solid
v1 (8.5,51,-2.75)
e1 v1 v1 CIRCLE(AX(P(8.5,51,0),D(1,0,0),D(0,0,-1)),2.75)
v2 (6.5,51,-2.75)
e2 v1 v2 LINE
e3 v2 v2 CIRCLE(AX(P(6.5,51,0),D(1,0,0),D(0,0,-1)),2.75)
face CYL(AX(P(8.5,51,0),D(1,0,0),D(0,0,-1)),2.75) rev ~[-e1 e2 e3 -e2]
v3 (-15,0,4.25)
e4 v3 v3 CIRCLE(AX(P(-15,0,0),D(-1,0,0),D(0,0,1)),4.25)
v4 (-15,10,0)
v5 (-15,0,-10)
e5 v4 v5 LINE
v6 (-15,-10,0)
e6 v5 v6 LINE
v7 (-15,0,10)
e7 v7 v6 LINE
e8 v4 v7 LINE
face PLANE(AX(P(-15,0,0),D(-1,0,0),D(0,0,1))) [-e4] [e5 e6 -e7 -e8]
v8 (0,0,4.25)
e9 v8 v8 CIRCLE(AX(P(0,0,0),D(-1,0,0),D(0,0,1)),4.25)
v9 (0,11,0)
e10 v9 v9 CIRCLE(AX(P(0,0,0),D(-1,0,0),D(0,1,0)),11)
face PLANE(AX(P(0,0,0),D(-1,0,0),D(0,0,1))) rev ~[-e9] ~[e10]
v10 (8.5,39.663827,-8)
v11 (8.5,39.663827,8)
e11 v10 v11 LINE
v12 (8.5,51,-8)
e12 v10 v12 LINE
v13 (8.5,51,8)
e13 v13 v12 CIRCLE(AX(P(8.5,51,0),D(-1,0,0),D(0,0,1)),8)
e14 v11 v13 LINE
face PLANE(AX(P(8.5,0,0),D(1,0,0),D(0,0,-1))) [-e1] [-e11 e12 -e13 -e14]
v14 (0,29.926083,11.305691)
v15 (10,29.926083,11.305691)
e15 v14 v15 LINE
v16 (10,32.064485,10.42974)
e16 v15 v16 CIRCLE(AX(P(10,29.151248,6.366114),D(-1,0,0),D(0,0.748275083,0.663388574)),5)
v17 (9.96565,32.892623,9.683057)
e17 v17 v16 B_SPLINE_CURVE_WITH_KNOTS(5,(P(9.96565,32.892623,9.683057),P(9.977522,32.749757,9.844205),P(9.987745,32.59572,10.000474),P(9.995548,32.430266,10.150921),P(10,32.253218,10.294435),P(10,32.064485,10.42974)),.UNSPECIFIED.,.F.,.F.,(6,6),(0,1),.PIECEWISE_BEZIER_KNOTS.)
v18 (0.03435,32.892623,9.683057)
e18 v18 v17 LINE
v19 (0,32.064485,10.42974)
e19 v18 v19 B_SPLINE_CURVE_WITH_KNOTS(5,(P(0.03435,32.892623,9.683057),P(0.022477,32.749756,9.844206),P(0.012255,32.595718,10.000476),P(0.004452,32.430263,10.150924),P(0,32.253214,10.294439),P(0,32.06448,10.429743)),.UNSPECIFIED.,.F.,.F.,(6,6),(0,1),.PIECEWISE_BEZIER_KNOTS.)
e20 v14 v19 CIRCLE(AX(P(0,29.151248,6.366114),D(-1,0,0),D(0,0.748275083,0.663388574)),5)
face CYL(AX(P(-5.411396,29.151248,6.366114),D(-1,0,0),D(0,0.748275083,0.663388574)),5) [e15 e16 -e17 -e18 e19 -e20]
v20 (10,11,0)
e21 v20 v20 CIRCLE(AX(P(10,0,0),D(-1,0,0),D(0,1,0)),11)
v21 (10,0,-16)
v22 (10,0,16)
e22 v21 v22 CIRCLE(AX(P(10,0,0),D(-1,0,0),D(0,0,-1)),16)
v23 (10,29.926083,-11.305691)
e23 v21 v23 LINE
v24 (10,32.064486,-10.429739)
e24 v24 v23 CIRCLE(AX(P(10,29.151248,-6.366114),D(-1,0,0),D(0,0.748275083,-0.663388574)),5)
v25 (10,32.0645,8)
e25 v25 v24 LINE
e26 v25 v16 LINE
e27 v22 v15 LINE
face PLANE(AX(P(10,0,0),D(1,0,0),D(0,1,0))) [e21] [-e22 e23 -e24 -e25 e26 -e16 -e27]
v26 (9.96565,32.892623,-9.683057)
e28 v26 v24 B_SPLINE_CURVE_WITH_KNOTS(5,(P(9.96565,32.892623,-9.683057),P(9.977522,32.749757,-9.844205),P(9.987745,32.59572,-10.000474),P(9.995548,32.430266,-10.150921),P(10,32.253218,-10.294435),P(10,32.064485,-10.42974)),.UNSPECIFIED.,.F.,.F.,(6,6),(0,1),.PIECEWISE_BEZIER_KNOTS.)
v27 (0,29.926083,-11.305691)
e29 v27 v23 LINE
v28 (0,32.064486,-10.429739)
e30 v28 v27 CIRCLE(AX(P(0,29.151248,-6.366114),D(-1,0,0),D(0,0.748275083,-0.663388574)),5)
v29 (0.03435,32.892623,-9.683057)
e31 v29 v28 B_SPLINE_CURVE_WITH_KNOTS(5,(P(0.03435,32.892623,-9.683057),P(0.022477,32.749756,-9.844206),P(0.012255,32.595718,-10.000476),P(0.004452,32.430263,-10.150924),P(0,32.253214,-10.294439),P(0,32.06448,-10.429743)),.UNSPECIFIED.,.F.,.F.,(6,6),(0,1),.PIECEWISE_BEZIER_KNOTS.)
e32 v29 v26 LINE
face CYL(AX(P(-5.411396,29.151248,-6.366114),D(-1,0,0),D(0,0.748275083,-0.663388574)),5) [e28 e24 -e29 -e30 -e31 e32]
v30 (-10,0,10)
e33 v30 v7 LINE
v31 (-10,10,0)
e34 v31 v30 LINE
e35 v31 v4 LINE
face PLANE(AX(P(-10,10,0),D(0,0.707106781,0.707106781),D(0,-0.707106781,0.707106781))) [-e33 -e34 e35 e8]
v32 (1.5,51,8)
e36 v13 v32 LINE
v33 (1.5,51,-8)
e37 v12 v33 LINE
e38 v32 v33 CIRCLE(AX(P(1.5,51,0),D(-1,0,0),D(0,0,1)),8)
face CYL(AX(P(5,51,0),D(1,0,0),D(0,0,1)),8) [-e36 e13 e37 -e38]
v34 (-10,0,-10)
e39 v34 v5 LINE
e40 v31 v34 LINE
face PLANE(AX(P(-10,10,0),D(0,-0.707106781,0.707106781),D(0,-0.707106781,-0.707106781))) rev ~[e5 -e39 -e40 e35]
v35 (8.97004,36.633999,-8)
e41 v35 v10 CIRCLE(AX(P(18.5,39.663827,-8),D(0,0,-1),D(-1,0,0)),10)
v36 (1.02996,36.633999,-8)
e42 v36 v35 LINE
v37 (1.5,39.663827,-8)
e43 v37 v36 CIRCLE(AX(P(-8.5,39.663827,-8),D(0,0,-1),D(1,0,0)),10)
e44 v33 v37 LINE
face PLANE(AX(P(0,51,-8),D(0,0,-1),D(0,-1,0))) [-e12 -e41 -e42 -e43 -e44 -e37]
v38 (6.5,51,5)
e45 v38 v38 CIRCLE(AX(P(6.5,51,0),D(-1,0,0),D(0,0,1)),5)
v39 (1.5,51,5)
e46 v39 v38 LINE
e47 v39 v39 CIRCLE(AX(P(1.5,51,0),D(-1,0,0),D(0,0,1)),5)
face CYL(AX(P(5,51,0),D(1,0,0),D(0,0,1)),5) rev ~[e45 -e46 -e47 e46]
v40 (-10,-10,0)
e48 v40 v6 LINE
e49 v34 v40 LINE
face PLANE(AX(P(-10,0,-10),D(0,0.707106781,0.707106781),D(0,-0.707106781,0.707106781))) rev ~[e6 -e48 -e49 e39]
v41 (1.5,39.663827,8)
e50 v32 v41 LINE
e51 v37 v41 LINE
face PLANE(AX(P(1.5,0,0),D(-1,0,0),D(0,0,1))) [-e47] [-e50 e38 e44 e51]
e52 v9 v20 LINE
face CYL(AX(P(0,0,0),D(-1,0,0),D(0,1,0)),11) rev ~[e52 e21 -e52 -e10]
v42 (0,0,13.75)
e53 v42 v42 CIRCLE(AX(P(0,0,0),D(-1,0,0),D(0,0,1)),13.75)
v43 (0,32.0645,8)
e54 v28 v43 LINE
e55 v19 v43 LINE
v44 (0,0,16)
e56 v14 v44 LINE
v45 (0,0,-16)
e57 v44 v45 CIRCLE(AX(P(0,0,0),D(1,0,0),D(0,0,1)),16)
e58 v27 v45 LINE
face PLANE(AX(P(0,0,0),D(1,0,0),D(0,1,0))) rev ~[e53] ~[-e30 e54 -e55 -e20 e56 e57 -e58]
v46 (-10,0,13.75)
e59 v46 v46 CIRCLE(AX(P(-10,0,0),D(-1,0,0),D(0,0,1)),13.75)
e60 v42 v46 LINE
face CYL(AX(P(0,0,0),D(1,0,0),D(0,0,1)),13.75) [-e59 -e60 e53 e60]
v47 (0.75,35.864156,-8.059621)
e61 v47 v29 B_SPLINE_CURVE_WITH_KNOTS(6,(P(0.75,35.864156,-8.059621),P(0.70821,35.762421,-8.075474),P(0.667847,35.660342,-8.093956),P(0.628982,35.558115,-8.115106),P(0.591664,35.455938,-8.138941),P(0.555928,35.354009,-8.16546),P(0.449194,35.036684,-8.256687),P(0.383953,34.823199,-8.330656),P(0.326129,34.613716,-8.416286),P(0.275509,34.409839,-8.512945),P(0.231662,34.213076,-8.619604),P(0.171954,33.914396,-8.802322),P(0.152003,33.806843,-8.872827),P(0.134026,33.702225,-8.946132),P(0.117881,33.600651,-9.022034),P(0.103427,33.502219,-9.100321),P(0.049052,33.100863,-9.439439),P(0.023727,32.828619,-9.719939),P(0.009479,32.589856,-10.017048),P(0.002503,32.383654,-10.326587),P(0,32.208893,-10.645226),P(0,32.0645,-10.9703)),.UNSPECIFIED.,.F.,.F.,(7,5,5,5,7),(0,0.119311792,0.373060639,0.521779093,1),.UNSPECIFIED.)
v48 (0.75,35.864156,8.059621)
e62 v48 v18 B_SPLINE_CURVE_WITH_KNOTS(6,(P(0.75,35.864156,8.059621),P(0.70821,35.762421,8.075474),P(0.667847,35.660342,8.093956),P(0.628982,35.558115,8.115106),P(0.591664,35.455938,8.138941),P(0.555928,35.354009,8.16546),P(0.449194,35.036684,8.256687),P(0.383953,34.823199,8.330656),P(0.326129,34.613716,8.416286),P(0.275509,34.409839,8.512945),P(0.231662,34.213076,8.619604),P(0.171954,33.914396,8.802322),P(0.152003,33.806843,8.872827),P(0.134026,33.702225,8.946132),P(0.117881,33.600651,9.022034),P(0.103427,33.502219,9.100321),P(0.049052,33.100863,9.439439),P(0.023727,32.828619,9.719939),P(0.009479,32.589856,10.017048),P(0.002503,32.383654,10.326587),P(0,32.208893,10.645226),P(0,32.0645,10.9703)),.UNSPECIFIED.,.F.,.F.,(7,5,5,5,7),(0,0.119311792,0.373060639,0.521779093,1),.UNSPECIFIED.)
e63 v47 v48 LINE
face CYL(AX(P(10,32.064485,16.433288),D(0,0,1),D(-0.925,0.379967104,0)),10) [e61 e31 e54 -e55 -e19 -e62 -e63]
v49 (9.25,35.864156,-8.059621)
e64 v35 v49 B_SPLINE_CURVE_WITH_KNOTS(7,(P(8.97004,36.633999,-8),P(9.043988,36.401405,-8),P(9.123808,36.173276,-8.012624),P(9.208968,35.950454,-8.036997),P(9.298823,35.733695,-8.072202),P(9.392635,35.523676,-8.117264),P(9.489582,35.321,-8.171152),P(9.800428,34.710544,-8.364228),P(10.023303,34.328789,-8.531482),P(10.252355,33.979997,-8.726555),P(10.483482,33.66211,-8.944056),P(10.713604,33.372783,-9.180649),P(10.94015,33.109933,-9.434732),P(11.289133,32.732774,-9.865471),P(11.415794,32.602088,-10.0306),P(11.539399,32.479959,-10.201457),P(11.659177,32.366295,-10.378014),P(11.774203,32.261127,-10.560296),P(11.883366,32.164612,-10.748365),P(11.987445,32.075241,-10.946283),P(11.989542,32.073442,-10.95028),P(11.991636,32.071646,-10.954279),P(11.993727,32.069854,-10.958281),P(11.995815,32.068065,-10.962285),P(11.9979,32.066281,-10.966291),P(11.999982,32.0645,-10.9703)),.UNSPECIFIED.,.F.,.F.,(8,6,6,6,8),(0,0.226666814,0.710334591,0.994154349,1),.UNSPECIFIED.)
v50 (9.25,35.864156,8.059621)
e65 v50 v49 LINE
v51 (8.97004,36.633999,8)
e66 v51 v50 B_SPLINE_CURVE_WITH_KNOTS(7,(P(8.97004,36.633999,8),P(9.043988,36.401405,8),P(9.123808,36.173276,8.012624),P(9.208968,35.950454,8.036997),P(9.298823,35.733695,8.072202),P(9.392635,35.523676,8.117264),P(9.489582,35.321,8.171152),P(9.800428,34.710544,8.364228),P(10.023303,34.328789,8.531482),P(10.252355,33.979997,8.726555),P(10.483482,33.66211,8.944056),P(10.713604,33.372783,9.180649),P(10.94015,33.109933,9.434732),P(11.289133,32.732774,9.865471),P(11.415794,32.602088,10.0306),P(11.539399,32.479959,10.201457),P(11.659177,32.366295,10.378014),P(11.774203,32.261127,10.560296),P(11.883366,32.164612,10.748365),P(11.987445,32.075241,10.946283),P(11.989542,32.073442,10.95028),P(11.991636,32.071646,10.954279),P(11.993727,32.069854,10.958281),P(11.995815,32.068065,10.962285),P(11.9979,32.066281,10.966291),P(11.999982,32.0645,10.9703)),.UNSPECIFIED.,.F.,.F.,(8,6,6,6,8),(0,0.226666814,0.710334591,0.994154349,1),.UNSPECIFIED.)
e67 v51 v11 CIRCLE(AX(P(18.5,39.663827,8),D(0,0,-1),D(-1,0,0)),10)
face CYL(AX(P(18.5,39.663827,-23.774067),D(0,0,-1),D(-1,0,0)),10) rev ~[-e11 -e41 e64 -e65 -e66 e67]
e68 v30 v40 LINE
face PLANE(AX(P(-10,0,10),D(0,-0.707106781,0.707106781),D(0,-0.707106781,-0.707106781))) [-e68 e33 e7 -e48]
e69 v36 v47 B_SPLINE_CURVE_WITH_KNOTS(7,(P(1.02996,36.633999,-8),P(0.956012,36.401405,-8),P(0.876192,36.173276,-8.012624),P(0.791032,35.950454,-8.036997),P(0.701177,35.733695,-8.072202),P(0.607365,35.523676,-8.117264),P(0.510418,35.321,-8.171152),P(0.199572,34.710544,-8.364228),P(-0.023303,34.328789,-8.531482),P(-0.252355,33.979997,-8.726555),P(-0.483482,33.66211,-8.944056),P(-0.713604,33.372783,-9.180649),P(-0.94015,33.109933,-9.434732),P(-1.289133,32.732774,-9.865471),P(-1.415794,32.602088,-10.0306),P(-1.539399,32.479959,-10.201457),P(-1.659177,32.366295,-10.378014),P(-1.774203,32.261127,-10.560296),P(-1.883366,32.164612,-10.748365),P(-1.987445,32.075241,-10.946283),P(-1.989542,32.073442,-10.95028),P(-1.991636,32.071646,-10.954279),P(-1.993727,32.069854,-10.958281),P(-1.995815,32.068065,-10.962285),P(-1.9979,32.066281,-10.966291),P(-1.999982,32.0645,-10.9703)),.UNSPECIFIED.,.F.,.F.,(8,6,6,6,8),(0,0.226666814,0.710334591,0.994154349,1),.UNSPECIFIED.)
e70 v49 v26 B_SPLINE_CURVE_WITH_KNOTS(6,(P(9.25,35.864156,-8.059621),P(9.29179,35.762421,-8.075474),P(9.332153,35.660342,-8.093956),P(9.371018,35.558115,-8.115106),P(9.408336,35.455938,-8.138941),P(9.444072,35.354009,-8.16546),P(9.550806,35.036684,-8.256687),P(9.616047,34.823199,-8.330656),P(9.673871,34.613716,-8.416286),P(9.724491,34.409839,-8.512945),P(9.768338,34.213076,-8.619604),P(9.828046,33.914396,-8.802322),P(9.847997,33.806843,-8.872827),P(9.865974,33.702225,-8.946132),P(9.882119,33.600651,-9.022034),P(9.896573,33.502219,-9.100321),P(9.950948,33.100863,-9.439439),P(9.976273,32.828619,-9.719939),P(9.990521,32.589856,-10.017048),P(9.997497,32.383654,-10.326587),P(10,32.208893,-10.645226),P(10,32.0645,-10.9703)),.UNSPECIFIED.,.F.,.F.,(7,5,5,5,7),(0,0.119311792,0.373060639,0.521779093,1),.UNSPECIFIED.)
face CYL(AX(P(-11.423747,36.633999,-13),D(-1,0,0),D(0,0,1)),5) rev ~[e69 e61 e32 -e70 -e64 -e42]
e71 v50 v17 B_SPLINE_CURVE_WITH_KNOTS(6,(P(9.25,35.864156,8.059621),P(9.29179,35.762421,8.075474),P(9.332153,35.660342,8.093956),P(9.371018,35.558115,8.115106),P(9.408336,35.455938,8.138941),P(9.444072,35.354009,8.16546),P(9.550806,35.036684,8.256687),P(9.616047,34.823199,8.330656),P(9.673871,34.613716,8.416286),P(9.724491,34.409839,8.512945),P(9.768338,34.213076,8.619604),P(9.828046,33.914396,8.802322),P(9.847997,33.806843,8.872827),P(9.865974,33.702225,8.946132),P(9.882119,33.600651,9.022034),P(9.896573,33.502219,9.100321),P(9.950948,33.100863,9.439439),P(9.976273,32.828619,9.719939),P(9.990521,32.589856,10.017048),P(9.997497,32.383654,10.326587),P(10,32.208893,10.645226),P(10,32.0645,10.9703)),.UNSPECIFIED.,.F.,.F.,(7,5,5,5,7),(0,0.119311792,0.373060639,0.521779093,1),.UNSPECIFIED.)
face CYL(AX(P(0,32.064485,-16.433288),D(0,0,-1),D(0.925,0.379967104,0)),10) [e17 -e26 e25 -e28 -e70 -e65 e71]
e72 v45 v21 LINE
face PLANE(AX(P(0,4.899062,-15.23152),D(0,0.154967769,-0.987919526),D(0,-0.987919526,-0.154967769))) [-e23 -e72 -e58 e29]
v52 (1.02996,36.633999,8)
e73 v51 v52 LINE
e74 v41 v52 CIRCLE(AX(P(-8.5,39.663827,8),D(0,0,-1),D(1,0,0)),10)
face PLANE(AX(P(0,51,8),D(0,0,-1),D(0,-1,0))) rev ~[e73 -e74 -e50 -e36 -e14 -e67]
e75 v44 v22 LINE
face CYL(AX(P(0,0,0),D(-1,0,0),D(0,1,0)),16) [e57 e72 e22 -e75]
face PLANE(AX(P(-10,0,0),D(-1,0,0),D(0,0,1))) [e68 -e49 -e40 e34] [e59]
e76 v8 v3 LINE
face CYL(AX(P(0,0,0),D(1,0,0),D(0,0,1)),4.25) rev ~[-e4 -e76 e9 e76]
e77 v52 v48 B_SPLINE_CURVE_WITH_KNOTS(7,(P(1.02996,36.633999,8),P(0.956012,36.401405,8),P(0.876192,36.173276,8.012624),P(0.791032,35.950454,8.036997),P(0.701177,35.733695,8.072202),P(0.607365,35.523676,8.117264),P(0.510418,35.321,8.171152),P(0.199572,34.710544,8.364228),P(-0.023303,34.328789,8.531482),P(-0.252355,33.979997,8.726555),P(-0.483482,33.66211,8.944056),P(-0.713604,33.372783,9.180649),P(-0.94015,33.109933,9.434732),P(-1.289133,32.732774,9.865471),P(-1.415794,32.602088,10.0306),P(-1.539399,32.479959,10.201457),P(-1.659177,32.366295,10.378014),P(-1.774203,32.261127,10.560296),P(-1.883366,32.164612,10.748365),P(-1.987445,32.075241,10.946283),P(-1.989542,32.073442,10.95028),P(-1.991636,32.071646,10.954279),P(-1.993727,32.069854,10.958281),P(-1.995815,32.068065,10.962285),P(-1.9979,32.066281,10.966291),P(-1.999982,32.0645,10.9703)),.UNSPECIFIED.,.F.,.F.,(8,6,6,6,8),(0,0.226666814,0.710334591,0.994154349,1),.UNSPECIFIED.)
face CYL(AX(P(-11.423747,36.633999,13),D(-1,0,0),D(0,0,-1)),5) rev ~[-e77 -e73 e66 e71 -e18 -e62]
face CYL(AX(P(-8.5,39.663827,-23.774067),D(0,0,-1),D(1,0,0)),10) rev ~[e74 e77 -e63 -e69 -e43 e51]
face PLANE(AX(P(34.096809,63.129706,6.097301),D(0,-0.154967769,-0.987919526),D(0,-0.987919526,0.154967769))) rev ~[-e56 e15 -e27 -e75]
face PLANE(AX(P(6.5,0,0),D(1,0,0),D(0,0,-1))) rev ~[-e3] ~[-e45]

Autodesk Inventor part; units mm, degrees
ref_plane "YZ Plane" through (0, 0, 0) normal (1, 0, 0) x (0, 1, 0)
ref_plane "XZ Plane" through (0, 0, 0) normal (0, 1, 0) x (-1, 0, 0)
sketch "Esquisse1" plane through (0, 0, 0) normal (1, 0, 0) x (0, 1, 0)
  circle A0 centre (0, 0) radius 16
  line L0 (-16, 0) -> (59, 0)
  line L1 (59, 0) -> (51, 0)
  circle A1 centre (51, 0) radius 5
  circle A2 centre (51, 0) radius 8
  line L2 (0, 16) -> (51, 8)
  line L3 (51, -8) -> (0, -16)
  circle A3 centre (0, 0) radius 11
  line L4 (34.396, -10.6045) -> (34.396, 10.6045)
  dimension "d0" = 32
  dimension "d1" = 75
  dimension "d2" = 8
  dimension "d3" = 10
  dimension "d4" = 16
  dimension "d5" = 22
extrude "Extrusion1" add sketch "Esquisse1" along normal blind 10 contours L2 A0 L0 A3 | L0 A3 A0 L3 | L2 L4 L0 A0 | L0 L4 L3 A0
sketch "Esquisse2" plane through (0, 0, 0) normal (-1, 0, 0) x (0, 0, 1)
  circle A0 centre (0, 0) radius 11
  circle A1 centre (0, 0) radius 4.25
  dimension "d8" = 8.5
extrude "Extrusion2" add sketch "Esquisse2" along normal blind 10
sketch "Esquisse3" plane through (-10, 0, 0) normal (-1, 0, 0) x (0, 0, 1)
  line L0 (0, 0) -> (-10, 0)
  circle A0 centre (0, 0) radius 11 projected
  line L1 (0, 0) -> (0, 10)
  circle A1 centre (0, 0) radius 4.25 projected
  line L2 (0, 0) -> (10, 0)
  line L3 (0, 0) -> (0, -10)
  line L4 (0, 10) -> (-10, 0)
  line L5 (0, 10) -> (10, 0)
  line L6 (10, 0) -> (0, -10)
  line L7 (-10, 0) -> (0, -10)
  circle A2 centre (0, 0) radius 4.25
  dimension "d12" = 10
  dimension "d13" = 10
  dimension "d14" = 10
  dimension "d15" = 10
  dimension "d16" = 8.5
extrude "Extrusion3" add sketch "Esquisse3" along normal blind 5 contours A1 L3 L7 L0 | L0 L4 L1 A1 | L1 L5 L2 A1 | L2 L6 L3 A1
sketch "Esquisse4" plane through (0, 0, 0) normal (-1, 0, 0) x (0, 0, 1)
  circle A0 centre (0, 0) radius 13.75
  circle A1 centre (0, 0) radius 11
  dimension "d19" = 27.5
extrude "Extrusion4" add sketch "Esquisse4" along normal up to surface (10 mm away)
ref_plane "Plan de construction1" through (5, 0, 0) normal (-1, 0, 0) x (0, 0, 1)
sketch "Esquisse7" plane through (5, 0, 0) normal (-1, 0, 0) x (0, 0, 1)
  point P0 (0, 0)
sketch "Esquisse8" plane through (5, 0, 0) normal (-1, 0, 0) x (0, 0, 1)
  circle A0 centre (0, 51) radius 5 projected
  circle A1 centre (0, 51) radius 4.25 projected
  line L0 (-16, 0) -> (-10.6045, 34.396) projected
  line L1 (10.6045, 34.396) -> (16, 0) projected
  arc A2 (8, 51) -> (-8, 51) centre (0, 51) ccw projected
  line L2 (-10.6045, 34.396) -> (10.6045, 34.396) projected
  line L3 (-10.6045, 34.396) -> (-8, 51)
  line L4 (8, 51) -> (10.6045, 34.396)
  line L5 (10.6045, 34.396) -> (-10.6045, 34.396)
  point P0 (0, 0)
extrude "Extrusion6" add sketch "Esquisse8" along normal mid plane 7 contours L4 L2 L3 A2
sketch "Esquisse9" plane through (8.5, 0, 0) normal (1, 0, 0) x (0, 0, -1)
  circle A0 centre (0, 51) radius 5 projected
  circle A1 centre (0, 51) radius 2.75
  circle A2 centre (0, 51) radius 5
  point P0 (0, 0)
  dimension "d37" = 5.5
extrude "Extrusion7" add sketch "Esquisse9" against normal blind 2
fillet "Congé1" radius 10 4 edges at (8.5, 34.396, 0) (1.5, 34.396, 0) (10, 34.396, 0) (0, 34.396, 0)
sketch "Esquisse10" plane through (0, 0, 0) normal (-1, 0, 0) x (0, 0, 1)
  line L0 (-10.9703, 32.0645) -> (10.9703, 32.0645) projected
  line L1 (-10.9703, 32.0645) -> (10.9703, 32.0645)
  arc A0 (8, 51) -> (-8, 51) centre (0, 51) ccw projected
  line L2 (-8, 51) -> (-8, 32.0645)
  line L3 (9.7782, 39.6638) -> (8, 51) projected
  line L4 (8, 51) -> (8, 32.0645)
  arc A1 (8, 51) -> (-8, 51) centre (0, 51) ccw
  line L5 (-10.9703, 32.0645) -> (-8, 51)
  line L6 (8, 51) -> (10.9703, 32.0645)
  point P0 (0, 0)
extrude "Extrusion8" cut sketch "Esquisse10" against normal blind 10 contours L5 L2 L0 | L4 L3 L6 L0
fillet "Congé2" radius 5 2 edges at (5, 32.0645, -8) (5, 32.0645, -10.9703)
fillet "Congé3" radius 5 2 edges at (5, 32.0645, 10.9703) (5, 32.0645, 8)
properties part number "bièlle côté"
